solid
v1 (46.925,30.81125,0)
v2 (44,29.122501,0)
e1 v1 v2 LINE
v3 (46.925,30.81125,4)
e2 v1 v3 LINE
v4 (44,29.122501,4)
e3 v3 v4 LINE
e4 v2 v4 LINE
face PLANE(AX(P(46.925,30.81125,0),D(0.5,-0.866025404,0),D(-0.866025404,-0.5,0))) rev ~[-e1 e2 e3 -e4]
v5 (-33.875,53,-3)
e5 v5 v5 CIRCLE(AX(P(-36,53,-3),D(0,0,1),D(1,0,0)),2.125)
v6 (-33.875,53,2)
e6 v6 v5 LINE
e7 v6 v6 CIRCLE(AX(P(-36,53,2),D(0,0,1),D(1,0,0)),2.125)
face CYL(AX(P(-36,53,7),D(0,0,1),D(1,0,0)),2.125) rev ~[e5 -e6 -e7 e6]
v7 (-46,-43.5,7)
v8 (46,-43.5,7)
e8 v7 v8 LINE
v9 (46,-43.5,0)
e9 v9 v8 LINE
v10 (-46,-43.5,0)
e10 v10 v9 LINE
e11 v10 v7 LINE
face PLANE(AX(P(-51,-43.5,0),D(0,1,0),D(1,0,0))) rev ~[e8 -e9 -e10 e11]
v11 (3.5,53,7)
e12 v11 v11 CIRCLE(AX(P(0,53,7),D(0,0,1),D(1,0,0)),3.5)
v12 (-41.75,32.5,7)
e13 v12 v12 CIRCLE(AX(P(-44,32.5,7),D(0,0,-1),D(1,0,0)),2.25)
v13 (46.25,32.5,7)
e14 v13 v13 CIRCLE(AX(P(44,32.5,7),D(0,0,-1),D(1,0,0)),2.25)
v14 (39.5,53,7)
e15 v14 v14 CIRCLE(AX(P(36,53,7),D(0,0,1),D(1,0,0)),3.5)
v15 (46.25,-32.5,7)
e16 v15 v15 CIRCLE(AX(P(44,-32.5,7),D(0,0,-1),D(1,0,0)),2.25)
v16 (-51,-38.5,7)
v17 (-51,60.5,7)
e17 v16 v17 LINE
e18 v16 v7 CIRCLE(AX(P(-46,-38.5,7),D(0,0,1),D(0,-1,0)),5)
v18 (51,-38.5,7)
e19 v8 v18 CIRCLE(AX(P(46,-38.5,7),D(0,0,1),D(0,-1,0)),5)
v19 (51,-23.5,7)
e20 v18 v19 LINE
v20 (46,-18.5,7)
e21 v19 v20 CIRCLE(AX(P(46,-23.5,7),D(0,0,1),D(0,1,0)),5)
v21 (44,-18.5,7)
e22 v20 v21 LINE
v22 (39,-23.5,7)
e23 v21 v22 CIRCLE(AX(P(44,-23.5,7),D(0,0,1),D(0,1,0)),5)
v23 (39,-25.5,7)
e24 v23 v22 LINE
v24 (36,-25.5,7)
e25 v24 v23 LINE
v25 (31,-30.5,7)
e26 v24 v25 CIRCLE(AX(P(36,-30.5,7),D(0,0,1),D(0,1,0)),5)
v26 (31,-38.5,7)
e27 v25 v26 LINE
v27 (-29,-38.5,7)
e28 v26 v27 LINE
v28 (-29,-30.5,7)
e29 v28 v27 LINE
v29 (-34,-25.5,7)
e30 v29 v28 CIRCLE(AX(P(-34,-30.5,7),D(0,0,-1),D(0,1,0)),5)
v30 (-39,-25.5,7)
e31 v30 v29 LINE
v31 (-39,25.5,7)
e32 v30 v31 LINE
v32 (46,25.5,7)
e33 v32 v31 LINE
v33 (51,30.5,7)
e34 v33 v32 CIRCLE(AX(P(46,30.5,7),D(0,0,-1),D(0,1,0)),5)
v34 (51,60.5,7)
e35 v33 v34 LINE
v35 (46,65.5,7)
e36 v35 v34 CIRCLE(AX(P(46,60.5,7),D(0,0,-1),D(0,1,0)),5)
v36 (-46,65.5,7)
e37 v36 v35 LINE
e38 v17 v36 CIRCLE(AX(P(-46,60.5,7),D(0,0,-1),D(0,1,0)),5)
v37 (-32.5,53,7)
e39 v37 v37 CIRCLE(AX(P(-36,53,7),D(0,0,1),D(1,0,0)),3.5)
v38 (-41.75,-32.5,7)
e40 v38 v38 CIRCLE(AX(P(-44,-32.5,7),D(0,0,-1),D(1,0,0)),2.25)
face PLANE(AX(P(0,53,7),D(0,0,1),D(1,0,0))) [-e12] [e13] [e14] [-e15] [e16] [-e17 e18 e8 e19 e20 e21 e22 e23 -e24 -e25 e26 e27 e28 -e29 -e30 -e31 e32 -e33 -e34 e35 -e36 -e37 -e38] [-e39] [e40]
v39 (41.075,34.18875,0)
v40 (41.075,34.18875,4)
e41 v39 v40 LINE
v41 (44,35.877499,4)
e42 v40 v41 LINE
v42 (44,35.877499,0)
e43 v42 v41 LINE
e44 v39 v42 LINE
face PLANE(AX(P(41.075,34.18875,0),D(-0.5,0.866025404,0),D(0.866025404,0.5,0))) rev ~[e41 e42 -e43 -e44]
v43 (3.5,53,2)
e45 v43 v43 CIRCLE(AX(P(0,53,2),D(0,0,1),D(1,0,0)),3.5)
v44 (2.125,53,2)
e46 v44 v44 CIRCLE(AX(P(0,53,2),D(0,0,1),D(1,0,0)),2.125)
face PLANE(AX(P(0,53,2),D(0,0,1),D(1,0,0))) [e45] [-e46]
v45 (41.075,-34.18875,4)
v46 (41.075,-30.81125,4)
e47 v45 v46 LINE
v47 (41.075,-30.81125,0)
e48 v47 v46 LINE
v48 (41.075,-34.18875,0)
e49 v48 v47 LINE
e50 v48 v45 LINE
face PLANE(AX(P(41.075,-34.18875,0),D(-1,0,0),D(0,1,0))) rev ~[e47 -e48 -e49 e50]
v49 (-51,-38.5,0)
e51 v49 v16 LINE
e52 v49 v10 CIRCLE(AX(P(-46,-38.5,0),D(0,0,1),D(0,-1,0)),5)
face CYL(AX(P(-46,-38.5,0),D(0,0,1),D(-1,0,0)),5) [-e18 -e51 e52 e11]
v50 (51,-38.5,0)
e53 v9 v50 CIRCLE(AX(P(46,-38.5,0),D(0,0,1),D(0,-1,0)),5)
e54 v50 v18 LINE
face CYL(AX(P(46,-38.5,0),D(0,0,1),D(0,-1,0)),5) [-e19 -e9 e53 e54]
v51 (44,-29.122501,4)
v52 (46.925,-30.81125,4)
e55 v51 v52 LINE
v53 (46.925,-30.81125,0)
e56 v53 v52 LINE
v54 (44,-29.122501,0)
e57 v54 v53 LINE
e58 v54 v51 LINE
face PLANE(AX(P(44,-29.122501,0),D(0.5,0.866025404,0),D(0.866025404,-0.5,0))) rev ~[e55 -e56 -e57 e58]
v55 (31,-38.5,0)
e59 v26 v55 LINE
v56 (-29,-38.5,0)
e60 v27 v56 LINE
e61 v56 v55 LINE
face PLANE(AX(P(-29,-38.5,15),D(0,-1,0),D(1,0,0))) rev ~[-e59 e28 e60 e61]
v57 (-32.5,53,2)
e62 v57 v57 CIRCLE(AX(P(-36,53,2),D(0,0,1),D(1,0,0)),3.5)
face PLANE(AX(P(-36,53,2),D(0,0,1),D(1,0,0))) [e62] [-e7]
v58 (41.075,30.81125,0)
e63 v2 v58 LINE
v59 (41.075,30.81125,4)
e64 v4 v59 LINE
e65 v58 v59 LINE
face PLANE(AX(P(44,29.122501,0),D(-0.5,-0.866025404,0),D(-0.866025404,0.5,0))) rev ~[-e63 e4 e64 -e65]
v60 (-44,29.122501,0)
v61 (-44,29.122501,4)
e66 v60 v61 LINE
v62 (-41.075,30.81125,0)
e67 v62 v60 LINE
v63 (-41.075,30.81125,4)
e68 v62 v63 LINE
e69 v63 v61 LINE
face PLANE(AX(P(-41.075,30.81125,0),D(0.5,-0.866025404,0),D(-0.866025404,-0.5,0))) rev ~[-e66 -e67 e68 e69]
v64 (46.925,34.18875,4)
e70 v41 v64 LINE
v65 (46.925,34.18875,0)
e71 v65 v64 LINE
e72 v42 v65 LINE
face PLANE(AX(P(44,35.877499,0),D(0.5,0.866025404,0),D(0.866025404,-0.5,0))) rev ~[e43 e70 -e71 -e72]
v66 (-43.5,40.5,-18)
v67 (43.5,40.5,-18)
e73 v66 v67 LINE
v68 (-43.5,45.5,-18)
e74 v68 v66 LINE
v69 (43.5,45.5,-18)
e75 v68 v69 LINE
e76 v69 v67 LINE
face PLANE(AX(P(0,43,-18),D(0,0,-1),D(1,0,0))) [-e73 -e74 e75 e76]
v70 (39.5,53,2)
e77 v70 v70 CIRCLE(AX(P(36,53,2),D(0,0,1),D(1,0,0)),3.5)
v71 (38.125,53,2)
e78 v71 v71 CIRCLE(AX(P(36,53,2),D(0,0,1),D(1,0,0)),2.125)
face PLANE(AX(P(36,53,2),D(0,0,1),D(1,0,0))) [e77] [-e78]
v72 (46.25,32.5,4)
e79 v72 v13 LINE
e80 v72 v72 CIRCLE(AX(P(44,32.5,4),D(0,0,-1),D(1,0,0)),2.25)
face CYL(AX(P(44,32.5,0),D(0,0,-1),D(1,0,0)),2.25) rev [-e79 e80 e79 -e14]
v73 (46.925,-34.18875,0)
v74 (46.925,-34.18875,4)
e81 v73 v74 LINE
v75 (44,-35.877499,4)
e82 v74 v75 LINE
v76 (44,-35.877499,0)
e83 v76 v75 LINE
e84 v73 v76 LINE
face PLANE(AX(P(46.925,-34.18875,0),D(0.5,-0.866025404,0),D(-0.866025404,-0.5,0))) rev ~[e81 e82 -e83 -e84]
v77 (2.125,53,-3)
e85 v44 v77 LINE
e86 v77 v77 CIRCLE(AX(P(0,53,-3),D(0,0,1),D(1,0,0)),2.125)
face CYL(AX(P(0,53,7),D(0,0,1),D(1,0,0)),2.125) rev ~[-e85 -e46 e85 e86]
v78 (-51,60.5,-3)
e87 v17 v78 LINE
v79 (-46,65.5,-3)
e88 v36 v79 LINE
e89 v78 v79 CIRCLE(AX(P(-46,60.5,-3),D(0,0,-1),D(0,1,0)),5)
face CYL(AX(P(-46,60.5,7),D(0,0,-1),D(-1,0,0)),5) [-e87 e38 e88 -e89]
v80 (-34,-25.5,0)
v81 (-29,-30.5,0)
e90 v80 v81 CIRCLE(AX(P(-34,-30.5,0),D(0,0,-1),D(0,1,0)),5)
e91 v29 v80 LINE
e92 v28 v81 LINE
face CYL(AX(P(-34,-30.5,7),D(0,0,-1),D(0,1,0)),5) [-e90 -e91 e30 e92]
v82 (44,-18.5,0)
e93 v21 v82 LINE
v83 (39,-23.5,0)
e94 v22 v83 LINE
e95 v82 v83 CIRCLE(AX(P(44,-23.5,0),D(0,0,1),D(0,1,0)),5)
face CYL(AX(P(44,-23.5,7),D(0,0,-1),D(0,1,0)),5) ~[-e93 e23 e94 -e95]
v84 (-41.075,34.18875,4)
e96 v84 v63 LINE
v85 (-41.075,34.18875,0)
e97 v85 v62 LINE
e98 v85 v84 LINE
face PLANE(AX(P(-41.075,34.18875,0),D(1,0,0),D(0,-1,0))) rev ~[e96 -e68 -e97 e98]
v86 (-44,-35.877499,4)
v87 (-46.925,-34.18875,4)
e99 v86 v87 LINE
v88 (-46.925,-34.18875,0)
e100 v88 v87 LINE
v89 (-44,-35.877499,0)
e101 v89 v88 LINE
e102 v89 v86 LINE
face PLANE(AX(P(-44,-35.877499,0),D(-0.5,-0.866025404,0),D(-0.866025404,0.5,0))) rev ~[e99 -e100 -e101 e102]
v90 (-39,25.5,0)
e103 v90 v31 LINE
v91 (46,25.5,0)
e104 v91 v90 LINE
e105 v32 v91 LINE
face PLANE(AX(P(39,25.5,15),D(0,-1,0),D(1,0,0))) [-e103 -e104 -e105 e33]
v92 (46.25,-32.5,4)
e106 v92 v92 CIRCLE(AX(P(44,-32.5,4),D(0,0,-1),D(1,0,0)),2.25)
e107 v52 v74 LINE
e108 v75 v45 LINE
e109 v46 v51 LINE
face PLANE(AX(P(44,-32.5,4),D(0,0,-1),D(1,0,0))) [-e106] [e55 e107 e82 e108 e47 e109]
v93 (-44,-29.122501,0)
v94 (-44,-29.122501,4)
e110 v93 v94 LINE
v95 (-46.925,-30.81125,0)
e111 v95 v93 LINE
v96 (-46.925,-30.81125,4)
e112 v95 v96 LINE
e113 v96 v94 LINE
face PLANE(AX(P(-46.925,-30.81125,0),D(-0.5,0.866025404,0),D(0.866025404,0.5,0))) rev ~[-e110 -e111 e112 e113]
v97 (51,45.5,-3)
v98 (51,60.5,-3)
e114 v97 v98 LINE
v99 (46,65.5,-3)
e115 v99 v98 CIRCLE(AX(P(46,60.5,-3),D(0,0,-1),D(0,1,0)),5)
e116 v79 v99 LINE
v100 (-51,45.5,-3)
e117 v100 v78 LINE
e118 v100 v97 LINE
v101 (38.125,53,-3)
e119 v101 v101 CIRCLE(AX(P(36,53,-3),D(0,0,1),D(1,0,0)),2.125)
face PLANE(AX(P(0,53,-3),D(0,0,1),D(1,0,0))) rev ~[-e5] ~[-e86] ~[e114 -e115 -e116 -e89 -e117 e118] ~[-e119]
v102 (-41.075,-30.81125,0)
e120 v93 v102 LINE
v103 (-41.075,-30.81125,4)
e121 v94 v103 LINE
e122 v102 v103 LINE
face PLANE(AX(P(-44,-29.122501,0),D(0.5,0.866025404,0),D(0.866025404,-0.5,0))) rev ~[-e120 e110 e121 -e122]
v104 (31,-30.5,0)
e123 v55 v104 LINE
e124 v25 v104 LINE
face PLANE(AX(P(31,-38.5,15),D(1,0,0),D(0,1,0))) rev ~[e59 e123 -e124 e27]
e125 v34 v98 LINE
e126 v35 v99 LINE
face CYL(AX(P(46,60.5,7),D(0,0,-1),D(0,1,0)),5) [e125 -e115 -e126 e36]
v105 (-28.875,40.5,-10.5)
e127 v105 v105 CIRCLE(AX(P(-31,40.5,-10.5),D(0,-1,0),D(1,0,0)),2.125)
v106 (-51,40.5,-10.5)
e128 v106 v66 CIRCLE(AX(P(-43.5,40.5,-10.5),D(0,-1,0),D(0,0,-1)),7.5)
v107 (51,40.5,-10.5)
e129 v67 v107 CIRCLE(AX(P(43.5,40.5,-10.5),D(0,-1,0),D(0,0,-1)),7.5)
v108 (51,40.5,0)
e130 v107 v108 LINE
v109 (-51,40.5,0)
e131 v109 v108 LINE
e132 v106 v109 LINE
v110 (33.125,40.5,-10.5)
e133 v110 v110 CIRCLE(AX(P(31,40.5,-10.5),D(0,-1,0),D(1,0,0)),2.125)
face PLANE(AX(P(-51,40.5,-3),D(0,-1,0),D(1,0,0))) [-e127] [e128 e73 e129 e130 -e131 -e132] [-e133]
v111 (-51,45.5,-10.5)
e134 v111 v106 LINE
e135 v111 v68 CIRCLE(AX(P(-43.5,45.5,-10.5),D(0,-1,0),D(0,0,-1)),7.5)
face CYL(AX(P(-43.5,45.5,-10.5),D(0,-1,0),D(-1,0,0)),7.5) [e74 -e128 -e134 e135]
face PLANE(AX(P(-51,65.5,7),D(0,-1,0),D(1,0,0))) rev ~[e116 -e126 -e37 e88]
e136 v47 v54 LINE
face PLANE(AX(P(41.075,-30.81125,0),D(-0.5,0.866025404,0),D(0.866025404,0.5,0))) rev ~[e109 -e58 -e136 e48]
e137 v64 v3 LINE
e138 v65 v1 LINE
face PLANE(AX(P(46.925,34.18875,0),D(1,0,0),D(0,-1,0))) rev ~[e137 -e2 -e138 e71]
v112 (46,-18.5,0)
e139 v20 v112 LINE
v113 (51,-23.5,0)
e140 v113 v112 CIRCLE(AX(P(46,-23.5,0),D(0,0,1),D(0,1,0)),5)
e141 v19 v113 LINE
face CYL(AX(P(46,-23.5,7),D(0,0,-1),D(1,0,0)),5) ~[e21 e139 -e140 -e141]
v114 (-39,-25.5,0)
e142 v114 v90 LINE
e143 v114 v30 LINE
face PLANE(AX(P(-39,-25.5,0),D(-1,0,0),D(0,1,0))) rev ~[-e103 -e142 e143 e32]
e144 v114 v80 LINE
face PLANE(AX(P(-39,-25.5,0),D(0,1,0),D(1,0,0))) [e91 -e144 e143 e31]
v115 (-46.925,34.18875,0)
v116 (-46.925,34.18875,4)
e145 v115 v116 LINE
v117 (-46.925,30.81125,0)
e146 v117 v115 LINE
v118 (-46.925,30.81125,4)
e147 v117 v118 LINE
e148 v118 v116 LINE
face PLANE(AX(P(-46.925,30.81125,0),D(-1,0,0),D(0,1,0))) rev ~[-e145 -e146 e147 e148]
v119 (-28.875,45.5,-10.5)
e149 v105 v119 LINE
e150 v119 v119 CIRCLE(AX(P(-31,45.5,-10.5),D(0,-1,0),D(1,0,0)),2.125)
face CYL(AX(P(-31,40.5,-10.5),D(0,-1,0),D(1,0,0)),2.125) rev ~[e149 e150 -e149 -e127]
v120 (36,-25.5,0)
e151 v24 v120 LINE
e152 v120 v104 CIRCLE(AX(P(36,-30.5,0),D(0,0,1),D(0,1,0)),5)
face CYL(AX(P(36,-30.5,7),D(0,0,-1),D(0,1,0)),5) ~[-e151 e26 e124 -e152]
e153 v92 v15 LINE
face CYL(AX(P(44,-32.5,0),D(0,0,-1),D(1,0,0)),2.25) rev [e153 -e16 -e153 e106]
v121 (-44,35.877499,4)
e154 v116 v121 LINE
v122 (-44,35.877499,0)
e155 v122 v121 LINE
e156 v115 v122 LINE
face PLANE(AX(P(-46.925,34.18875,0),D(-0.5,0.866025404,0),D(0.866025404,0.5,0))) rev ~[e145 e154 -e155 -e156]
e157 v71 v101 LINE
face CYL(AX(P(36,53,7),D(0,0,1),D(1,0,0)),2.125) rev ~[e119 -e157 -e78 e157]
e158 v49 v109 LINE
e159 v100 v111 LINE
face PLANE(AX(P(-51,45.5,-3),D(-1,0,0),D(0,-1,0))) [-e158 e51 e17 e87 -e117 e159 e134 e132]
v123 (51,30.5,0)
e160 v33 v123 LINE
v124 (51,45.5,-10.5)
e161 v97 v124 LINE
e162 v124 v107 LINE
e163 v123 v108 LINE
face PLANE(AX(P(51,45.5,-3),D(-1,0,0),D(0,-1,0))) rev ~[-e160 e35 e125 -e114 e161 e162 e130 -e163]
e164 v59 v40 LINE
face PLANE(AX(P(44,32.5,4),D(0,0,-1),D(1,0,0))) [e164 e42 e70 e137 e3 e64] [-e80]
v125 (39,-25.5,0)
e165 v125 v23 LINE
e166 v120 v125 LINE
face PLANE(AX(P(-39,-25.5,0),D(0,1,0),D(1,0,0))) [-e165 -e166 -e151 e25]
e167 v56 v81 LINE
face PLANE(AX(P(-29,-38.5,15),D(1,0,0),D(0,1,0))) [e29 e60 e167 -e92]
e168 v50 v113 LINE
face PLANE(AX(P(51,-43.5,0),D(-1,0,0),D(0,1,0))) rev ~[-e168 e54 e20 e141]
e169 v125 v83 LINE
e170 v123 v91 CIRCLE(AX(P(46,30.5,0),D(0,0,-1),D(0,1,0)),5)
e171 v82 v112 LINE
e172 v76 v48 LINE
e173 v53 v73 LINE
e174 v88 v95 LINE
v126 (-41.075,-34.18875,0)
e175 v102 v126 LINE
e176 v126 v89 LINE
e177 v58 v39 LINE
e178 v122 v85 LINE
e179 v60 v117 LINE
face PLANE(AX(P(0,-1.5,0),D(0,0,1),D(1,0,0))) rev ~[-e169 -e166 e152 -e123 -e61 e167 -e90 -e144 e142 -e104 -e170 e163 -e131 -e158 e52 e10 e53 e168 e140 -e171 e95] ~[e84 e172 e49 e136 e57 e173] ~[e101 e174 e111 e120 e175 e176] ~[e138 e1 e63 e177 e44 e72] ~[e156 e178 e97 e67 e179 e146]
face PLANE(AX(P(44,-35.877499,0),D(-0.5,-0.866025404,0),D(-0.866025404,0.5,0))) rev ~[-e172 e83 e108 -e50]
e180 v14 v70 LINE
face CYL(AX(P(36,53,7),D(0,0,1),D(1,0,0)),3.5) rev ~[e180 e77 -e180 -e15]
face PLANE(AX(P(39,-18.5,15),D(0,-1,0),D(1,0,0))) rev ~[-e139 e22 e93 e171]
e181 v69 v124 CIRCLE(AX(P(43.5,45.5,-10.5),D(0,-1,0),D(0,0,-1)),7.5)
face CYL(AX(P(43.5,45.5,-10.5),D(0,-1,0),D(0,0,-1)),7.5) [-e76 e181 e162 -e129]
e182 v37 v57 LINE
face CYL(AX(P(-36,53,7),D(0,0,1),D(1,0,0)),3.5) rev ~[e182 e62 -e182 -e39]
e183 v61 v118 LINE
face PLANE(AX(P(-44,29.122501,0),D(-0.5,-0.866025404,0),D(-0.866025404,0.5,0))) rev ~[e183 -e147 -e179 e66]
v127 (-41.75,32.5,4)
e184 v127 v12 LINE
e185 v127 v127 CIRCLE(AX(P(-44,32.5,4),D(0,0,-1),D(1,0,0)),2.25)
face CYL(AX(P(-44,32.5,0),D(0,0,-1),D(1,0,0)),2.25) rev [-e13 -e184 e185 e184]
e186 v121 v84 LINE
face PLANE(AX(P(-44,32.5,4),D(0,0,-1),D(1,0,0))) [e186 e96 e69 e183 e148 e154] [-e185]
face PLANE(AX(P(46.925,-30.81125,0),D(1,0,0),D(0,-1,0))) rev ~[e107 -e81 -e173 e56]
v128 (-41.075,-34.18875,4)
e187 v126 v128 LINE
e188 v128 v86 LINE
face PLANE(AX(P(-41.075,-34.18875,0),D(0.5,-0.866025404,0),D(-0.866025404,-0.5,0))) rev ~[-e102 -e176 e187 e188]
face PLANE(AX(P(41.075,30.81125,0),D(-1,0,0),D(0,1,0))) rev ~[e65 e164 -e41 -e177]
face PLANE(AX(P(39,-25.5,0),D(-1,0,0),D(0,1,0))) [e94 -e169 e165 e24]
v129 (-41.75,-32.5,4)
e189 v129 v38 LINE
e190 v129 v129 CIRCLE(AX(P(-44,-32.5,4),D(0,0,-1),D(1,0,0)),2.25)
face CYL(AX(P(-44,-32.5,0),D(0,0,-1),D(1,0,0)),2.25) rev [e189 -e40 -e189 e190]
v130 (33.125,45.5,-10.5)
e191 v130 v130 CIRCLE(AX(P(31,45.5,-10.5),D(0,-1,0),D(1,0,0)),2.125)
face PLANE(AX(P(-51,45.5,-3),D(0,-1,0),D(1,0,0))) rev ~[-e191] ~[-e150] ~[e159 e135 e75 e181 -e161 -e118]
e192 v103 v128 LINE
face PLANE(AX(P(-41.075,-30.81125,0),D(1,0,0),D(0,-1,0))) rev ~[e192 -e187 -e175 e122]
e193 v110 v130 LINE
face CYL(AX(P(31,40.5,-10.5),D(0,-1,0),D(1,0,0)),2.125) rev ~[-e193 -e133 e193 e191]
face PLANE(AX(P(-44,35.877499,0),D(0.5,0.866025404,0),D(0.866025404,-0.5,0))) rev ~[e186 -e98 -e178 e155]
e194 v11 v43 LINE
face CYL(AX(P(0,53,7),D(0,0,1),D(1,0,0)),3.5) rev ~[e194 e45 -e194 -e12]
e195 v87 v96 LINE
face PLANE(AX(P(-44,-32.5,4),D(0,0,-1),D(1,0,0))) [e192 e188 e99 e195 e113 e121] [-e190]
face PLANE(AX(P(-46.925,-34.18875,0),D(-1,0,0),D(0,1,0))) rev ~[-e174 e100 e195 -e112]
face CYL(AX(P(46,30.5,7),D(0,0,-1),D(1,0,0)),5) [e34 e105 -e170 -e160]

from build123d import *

# Parameters (mm, degrees)
F0_W      = 102
F0_H      = 84
F0_R      = 2.25
F0_W_2    = 78
F0_H_2    = 51
F1_DEPTH  = 15
F3_DEPTH  = 4
F4_W      = 12
F4_H      = 44
F4_W_2    = 60
F4_H_2    = 13
F5_DEPTH  = 15.001
F6_W      = 102
F6_H      = 84
F7_DEPTH  = 8
F8_W      = 102
F8_H      = 25
F8_R      = 2.125
F9_DEPTH  = 10
F10_R     = 3.5
F11_DEPTH = 5
F12_R     = 5
F13_W     = 102
F13_H     = 5
F14_DEPTH = 15
F15_R     = 2.125
F16_DEPTH = 25
F17_R     = 7.5


with BuildPart() as f1:
    # F0 (on Top) → F1 (new body)
    with BuildSketch(Plane.XY):
        with Locations((0, -1.5)):
            Rectangle(F0_W, F0_H)
        with Locations((-44, -32.5)):
            Circle(F0_R, mode=Mode.SUBTRACT)
        with Locations((44, -32.5)):
            Circle(F0_R, mode=Mode.SUBTRACT)
        with Locations((-44, 32.5)):
            Circle(F0_R, mode=Mode.SUBTRACT)
        Rectangle(F0_W_2, F0_H_2, mode=Mode.SUBTRACT)
        with Locations((44, 32.5)):
            Circle(F0_R, mode=Mode.SUBTRACT)
    extrude(amount=F1_DEPTH)

    # F2 (on face) → F3 (cut)
    with BuildSketch(Plane(origin=(0, 0, 0), x_dir=(1, 0, 0), z_dir=(0, 0, -1))):
        Polygon((-41.075, 30.8112504626), (-41.075, 34.1887495374), (-44, 35.8774990748), (-46.925, 34.1887495374), (-46.925, 30.8112504626), (-44, 29.1225009252), align=None)
        Polygon((41.075, 34.1887495374), (41.075, 30.8112504626), (44, 29.1225009252), (46.925, 30.8112504626), (46.925, 34.1887495374), (44, 35.8774990748), align=None)
        Polygon((41.075, -30.8112504626), (41.075, -34.1887495374), (44, -35.8774990748), (46.925, -34.1887495374), (46.925, -30.8112504626), (44, -29.1225009252), align=None)
        Polygon((-41.075, -34.1887495374), (-41.075, -30.8112504626), (-44, -29.1225009252), (-46.925, -30.8112504626), (-46.925, -34.1887495374), (-44, -35.8774990748), align=None)
    extrude(amount=-F3_DEPTH, mode=Mode.SUBTRACT)

    # F4 (on face) → F5 (cut, through all)
    with BuildSketch(Plane.XY.offset(15)):
        with Locations((45, 3.5)):
            Rectangle(F4_W, F4_H)
        with Locations((1, -32)):
            Rectangle(F4_W_2, F4_H_2)
    extrude(amount=-F5_DEPTH, mode=Mode.SUBTRACT)

    # F6 (on face) → F7 (cut)
    with BuildSketch(Plane.XY.offset(15)):
        with Locations((0, -1.5)):
            Rectangle(F6_W, F6_H)
    extrude(amount=-F7_DEPTH, mode=Mode.SUBTRACT)

    # F8 (on face) → F9 (join)
    with BuildSketch(Plane.XY.offset(7)):
        with Locations((0, 53)):
            Rectangle(F8_W, F8_H)
        with Locations((-36, 53)):
            Circle(F8_R, mode=Mode.SUBTRACT)
        with Locations((0, 53)):
            Circle(F8_R, mode=Mode.SUBTRACT)
        with Locations((36, 53)):
            Circle(F8_R, mode=Mode.SUBTRACT)
    extrude(amount=-F9_DEPTH)

    # F10 (on face) → F11 (cut)
    with BuildSketch(Plane.XY.offset(7)):
        with Locations((36, 53)):
            Circle(F10_R)
        with Locations((0, 53)):
            Circle(F10_R)
        with Locations((-36, 53)):
            Circle(F10_R)
    extrude(amount=-F11_DEPTH, mode=Mode.SUBTRACT)

    # F12
    f12_edges = [f1.edges().sort_by_distance(p)[0] for p in [
        (-51, -43.5, 3.5),
        (51, -43.5, 3.5),
        (51, 25.5, 3.5),
        (51, -18.5, 3.5),
        (39, -18.5, 3.5),
        (31, -25.5, 3.5),
        (-29, -25.5, 3.5),
        (-51, 65.5, 2),
        (51, 65.5, 2),
    ]]
    fillet(f12_edges, radius=F12_R)

    # F13 (on face) → F14 (join)
    with BuildSketch(Plane(origin=(0, 0, -3), x_dir=(1, 0, 0), z_dir=(0, 0, -1))):
        with Locations((0, -43)):
            Rectangle(F13_W, F13_H)
    extrude(amount=F14_DEPTH)

    # F15 (on face) → F16 (cut)
    with BuildSketch(Plane.XZ.offset(-40.5)):
        with Locations((-31, -10.5)):
            Circle(F15_R)
        with Locations((31, -10.5)):
            Circle(F15_R)
    extrude(amount=-F16_DEPTH, mode=Mode.SUBTRACT)

    # F17
    f17_edges = [f1.edges().sort_by_distance(p)[0] for p in [
        (-51, 43, -18),
        (51, 43, -18),
    ]]
    fillet(f17_edges, radius=F17_R)


solid = f1.part
